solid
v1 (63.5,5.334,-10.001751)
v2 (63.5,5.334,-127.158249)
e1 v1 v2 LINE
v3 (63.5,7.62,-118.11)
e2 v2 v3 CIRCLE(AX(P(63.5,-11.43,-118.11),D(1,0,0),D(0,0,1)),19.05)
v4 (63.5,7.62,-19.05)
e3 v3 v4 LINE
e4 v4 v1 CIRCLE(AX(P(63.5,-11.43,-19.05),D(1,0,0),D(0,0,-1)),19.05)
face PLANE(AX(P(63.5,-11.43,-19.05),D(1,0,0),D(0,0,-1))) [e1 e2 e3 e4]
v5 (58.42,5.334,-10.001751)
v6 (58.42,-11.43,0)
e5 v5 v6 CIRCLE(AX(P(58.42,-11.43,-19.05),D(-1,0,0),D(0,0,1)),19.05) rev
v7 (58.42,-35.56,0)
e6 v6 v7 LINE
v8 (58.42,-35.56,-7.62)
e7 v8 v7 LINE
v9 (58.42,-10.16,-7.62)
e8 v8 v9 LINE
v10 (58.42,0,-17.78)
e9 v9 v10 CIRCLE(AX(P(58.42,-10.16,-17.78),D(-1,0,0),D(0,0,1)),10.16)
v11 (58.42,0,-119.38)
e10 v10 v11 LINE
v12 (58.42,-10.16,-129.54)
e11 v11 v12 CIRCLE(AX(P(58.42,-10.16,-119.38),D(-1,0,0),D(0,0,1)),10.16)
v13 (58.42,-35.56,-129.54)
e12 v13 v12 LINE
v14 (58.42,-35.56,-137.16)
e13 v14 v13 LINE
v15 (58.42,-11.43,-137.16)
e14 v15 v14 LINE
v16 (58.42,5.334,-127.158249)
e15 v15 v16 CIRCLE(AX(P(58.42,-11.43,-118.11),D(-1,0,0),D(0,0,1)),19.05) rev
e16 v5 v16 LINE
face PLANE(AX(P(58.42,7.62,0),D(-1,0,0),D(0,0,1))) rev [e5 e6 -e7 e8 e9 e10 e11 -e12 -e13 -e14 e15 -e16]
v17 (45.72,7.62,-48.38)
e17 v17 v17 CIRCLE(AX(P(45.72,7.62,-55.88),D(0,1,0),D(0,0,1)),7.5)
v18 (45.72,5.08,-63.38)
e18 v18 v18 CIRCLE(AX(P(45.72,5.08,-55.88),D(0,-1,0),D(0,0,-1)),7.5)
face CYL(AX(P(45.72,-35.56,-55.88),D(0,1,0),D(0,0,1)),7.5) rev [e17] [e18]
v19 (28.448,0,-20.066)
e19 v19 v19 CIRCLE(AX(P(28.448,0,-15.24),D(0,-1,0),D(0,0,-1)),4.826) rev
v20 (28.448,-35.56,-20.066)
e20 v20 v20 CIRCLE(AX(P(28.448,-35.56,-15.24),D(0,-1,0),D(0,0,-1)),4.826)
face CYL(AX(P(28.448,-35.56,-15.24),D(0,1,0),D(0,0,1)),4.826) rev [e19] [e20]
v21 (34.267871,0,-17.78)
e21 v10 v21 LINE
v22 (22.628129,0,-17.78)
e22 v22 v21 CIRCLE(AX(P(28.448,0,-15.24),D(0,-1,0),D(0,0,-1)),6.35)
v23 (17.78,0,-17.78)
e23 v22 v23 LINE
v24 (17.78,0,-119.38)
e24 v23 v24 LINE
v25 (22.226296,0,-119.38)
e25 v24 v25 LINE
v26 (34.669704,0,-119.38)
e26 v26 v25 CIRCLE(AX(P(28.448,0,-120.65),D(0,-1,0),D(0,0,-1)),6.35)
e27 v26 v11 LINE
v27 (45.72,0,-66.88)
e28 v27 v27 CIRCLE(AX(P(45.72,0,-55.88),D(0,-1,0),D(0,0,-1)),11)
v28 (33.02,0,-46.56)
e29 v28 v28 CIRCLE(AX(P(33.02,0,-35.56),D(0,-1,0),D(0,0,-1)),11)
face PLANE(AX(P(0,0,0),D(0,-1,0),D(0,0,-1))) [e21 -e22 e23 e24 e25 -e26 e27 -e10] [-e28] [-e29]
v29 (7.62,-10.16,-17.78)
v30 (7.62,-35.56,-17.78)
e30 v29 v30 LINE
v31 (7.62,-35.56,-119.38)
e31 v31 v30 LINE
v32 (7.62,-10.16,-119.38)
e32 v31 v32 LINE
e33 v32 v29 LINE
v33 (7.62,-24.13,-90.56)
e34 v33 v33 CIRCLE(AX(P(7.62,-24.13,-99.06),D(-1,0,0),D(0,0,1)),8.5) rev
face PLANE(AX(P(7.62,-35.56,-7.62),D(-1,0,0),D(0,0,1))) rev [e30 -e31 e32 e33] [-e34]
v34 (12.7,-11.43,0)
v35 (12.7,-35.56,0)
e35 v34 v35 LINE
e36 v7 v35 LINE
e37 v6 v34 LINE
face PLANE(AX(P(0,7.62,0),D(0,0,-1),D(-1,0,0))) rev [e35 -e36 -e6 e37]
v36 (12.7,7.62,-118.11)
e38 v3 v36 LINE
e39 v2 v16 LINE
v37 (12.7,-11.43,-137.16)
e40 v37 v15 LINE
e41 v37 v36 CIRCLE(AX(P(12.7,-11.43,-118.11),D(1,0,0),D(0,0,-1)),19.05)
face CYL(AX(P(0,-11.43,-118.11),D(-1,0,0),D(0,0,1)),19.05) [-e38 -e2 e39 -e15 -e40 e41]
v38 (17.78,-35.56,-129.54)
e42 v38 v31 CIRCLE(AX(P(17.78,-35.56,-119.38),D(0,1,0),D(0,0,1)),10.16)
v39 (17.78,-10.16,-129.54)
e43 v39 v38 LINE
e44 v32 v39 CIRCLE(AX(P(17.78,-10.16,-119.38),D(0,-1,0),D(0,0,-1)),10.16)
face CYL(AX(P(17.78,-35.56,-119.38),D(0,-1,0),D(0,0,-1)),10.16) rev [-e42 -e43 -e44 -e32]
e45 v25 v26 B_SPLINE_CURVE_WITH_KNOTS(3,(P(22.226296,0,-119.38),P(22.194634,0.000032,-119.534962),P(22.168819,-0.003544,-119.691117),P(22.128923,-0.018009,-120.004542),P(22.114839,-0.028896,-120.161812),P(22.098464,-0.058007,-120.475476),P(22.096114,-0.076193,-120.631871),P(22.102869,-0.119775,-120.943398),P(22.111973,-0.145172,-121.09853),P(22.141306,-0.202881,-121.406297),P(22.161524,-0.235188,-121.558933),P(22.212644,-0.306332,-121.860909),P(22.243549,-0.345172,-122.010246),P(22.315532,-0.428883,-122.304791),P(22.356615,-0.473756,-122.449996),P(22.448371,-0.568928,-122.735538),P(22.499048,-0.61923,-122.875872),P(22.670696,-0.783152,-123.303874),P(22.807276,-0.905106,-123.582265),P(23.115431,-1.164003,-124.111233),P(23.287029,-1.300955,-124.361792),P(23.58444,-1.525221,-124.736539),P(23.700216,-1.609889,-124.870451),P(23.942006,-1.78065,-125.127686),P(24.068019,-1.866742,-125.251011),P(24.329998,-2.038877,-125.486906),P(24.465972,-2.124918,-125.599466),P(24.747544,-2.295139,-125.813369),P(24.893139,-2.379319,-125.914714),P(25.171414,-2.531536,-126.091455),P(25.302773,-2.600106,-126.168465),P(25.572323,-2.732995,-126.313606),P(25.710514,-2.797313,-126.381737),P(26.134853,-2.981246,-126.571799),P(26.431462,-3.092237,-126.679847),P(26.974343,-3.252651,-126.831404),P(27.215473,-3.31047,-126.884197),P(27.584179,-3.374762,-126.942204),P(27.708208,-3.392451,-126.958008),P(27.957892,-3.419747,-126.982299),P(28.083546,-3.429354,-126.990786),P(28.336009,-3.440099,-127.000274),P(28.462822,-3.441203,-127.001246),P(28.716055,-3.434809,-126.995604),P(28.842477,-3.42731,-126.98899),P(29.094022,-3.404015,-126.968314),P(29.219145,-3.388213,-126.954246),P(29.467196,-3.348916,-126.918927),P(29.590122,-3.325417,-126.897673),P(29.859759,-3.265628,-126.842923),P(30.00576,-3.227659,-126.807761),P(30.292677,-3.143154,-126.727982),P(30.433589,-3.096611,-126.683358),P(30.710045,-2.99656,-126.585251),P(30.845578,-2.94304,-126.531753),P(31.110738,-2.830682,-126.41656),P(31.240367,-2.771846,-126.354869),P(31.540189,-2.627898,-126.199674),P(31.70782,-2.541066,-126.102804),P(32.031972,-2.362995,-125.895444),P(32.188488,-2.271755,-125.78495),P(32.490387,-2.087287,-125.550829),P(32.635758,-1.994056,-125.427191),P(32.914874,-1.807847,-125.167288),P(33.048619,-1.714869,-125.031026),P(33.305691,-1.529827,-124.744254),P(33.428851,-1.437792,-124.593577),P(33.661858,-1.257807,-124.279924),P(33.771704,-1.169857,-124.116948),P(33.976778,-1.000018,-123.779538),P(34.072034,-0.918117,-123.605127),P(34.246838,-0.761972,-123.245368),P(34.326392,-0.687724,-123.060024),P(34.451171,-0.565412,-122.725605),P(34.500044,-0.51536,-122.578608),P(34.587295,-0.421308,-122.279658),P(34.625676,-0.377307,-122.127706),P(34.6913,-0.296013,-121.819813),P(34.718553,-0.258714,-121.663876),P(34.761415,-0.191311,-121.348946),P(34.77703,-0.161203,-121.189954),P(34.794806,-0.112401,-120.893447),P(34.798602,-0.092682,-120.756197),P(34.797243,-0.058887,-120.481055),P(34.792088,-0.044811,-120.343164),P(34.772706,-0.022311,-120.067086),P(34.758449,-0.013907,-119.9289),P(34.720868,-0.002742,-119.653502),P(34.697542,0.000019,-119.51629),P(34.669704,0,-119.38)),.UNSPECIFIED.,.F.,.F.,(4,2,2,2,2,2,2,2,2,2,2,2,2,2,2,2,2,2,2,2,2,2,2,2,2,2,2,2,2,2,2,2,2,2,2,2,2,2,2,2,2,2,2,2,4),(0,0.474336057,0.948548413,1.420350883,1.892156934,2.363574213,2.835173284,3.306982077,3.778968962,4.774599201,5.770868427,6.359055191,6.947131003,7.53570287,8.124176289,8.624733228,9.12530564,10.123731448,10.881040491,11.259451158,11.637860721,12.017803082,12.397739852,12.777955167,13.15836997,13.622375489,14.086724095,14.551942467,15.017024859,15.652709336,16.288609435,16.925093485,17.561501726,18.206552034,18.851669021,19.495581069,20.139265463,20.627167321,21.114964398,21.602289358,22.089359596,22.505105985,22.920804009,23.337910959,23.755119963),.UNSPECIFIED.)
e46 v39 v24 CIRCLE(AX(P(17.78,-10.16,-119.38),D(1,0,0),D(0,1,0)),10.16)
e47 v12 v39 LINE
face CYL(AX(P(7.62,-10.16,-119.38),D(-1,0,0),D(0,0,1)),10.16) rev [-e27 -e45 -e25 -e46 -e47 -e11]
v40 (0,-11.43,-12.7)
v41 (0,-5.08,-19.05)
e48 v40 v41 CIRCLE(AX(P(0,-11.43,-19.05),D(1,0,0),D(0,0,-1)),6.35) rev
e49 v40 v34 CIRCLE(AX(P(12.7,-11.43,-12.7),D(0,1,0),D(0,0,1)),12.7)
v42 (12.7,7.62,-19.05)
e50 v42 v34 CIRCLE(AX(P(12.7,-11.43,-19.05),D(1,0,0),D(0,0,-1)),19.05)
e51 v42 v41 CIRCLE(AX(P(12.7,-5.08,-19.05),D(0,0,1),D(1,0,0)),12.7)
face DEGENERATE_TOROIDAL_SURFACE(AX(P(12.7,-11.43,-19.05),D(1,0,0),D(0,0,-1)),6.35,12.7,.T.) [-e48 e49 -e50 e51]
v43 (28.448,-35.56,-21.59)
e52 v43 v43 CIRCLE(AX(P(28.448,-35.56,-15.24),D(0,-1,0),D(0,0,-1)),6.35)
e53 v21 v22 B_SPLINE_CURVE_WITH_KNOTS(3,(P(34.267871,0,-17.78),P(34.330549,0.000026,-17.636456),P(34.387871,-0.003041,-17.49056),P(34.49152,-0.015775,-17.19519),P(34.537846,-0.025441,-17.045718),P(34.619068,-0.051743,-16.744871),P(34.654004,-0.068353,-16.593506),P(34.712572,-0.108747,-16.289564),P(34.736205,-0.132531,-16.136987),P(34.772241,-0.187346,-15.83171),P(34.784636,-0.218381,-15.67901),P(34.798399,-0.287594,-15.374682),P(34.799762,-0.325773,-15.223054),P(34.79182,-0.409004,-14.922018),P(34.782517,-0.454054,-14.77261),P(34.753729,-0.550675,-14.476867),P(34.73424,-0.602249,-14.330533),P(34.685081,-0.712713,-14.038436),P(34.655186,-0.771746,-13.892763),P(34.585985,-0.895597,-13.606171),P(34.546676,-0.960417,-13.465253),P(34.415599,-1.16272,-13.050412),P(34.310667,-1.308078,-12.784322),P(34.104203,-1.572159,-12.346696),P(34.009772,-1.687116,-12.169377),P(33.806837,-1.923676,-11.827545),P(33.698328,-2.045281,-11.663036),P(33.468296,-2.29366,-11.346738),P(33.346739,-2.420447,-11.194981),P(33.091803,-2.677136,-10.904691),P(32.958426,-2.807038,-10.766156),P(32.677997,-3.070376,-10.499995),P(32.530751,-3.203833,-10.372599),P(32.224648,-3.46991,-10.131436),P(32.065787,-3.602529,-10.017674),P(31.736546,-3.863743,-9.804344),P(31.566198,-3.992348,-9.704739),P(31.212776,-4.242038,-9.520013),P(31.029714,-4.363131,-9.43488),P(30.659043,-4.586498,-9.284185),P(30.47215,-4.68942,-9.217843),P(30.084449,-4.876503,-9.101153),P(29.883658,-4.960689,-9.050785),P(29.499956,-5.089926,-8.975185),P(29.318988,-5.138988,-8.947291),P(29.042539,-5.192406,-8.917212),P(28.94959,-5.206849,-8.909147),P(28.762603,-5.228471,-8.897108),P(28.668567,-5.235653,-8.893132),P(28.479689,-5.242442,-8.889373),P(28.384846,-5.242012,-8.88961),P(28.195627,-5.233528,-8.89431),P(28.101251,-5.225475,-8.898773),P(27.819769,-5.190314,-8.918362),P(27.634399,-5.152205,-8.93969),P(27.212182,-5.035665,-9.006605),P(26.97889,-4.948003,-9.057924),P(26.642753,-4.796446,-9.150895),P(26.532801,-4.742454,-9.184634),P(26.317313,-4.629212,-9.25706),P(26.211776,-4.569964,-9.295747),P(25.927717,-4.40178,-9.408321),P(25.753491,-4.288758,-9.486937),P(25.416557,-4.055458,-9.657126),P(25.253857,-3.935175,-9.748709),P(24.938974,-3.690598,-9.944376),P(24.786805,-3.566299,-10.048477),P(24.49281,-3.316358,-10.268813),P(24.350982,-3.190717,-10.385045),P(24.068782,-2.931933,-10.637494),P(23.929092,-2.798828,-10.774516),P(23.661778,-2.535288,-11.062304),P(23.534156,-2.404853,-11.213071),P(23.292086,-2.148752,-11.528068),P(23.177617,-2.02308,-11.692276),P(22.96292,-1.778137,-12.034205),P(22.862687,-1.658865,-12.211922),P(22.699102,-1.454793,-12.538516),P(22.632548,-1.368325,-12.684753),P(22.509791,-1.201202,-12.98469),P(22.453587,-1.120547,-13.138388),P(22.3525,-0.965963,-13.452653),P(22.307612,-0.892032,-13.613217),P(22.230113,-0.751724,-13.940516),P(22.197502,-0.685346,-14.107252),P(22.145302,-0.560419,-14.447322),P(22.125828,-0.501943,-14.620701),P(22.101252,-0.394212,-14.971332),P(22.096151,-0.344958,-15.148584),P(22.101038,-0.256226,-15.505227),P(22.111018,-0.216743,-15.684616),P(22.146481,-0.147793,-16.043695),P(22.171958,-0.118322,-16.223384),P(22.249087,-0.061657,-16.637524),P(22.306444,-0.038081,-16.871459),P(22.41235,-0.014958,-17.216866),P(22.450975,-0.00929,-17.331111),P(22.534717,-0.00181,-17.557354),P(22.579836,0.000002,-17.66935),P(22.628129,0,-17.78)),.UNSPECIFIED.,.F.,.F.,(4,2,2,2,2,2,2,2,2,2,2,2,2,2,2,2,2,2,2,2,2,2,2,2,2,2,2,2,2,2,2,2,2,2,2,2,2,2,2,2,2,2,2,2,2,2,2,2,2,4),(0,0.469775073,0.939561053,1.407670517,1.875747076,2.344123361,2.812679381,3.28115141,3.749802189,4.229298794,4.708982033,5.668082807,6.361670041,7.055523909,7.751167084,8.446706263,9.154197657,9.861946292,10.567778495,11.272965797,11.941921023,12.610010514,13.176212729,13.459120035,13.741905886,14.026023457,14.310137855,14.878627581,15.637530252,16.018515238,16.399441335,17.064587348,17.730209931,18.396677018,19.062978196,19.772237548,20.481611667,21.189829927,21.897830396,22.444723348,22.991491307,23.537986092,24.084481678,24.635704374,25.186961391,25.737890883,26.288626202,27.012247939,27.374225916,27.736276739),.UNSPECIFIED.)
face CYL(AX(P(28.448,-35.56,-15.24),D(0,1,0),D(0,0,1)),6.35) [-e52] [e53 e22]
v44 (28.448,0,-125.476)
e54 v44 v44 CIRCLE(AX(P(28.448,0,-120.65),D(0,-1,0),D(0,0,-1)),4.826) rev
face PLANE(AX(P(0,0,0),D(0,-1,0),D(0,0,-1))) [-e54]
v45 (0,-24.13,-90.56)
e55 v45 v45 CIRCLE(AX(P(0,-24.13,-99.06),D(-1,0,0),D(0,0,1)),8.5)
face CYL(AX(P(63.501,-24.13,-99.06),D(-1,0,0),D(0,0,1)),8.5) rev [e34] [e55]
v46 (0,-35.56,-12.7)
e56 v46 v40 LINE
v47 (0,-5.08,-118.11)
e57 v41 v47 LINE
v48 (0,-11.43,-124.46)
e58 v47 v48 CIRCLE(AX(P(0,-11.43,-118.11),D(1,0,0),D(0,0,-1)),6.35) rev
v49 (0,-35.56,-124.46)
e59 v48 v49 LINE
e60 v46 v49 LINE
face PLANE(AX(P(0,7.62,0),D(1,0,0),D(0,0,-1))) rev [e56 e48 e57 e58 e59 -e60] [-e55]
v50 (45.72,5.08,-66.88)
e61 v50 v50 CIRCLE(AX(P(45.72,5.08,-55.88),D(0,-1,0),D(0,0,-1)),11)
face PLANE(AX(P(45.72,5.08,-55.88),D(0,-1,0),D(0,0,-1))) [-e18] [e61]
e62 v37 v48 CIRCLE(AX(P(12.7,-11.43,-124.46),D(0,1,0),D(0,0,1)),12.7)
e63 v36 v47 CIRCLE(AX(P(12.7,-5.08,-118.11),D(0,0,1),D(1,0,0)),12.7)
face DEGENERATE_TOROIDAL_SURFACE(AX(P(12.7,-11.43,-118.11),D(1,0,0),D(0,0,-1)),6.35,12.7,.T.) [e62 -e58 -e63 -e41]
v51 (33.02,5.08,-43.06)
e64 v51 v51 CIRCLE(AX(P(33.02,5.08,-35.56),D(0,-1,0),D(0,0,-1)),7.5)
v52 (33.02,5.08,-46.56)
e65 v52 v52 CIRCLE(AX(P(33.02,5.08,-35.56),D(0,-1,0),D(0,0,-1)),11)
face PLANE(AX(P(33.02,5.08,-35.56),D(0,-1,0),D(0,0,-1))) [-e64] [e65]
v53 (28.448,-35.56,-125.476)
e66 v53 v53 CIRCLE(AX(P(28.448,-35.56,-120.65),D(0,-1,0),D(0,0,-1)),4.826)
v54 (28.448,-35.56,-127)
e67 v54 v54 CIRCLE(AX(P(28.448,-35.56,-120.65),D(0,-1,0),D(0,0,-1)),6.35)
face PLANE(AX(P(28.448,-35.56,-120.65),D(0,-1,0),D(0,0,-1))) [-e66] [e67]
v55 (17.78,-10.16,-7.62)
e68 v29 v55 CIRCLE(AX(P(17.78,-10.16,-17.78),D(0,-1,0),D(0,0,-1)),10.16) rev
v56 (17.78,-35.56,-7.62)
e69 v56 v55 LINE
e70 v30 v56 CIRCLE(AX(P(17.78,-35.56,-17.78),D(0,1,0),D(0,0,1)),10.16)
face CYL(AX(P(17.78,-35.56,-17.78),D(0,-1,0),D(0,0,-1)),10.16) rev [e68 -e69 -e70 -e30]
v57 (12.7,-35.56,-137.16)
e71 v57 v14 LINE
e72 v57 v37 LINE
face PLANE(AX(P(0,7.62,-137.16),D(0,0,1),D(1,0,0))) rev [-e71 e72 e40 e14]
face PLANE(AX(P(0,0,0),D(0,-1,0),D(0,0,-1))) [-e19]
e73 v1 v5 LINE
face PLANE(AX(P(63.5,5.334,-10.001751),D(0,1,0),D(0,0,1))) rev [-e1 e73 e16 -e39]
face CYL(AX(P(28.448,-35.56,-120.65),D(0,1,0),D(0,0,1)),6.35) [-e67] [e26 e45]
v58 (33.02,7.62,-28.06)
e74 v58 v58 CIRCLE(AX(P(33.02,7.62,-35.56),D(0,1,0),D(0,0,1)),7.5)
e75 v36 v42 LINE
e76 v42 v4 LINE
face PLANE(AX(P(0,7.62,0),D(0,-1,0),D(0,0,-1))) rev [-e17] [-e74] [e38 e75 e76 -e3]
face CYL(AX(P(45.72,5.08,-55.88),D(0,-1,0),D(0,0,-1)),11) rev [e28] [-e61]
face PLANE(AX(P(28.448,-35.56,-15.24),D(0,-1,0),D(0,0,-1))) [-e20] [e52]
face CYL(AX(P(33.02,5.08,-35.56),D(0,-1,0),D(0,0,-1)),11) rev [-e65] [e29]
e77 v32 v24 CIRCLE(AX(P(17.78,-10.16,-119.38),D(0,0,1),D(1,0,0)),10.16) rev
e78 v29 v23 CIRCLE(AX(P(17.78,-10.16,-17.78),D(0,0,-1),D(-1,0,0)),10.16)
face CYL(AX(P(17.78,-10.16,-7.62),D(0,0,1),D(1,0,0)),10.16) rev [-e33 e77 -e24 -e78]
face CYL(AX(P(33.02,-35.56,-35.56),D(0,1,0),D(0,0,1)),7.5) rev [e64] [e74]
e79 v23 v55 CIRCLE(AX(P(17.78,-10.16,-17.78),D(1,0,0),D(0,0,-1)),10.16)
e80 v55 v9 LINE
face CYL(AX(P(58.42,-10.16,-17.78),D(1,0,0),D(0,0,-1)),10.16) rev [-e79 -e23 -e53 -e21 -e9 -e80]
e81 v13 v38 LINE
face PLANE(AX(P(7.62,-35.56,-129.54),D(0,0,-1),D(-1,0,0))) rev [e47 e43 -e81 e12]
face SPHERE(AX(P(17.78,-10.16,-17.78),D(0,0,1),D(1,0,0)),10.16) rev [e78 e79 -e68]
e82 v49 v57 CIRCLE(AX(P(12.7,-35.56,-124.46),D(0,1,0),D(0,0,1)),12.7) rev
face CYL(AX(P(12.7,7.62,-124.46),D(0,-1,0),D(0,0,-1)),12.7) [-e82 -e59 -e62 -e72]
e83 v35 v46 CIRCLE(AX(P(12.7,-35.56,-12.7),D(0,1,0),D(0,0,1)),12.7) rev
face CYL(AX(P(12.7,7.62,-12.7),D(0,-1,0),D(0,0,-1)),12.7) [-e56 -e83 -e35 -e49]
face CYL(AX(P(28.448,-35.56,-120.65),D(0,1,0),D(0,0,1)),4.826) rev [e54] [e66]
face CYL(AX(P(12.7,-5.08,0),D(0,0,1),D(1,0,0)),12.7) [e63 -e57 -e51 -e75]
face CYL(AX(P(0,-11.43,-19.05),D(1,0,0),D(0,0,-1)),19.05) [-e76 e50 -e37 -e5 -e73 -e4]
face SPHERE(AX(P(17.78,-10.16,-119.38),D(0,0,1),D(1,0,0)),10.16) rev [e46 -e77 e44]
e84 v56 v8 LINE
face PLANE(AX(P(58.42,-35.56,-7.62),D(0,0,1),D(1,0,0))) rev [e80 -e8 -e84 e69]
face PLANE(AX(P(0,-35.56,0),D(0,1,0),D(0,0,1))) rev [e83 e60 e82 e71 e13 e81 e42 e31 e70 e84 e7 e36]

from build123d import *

# Parameters (mm, degrees)
SKETCH1_W           = 58.42
SKETCH1_H           = 137.16
BOSS_EXTRUDE1_DEPTH = 7.62
SKETCH2_R           = 6.35
SKETCH2_R_2         = 4.826
BOSS_EXTRUDE2_DEPTH = 35.56
BOSS_EXTRUDE3_DEPTH = 35.56
FILLET1_R           = 19.05
FILLET2_R           = 12.7
BOSS_EXTRUDE4_DEPTH = 5.08
SKETCH7_R           = 7.5
CUT_EXTRUDE1_DEPTH  = 158.192964219
CUT_EXTRUDE2_START  = -5.08
SKETCH8_R           = 11
SKETCH8_R_2         = 7.5
CUT_EXTRUDE2_DEPTH  = 5.08
FILLET3_R           = 10.16
CUT_EXTRUDE3_REACH  = 157.273
SKETCH9_R           = 8.5


with BuildPart() as part:
    # Sketch1 → Boss-Extrude1 (new body)
    with BuildSketch(Plane(origin=(0, 0, 0), x_dir=(1, 0, 0), z_dir=(0, 1, 0))):
        with Locations((29.21, 68.58)):
            Rectangle(SKETCH1_W, SKETCH1_H)
    extrude(amount=BOSS_EXTRUDE1_DEPTH)

    # Sketch2 → Boss-Extrude2 (add)
    # profile 1 of 2: a face of its own
    with BuildSketch(Plane.XZ):
        with Locations(Location((28.448, -120.65, 0), (0, 0, 270))):
            Circle(SKETCH2_R)
        with Locations(Location((28.448, -120.65, 0), (0, 0, 270))):
            Circle(SKETCH2_R_2, mode=Mode.SUBTRACT)
    # profile 2 of 2: a face of its own
    with BuildSketch(Plane.XZ):
        with Locations(Location((28.448, -15.24, 0), (0, 0, 270))):
            Circle(SKETCH2_R)
        with Locations(Location((28.448, -15.24, 0), (0, 0, 270))):
            Circle(SKETCH2_R_2, mode=Mode.SUBTRACT)
    extrude(amount=BOSS_EXTRUDE2_DEPTH)

    # Sketch3 → Boss-Extrude3 (add)
    with BuildSketch(Plane.XZ):
        Polygon((58.42, -137.16), (0, -137.16), (0, 0), (58.42, 0), (58.42, -7.62), (7.62, -7.62), (7.62, -129.54), (58.42, -129.54), align=None)
    extrude(amount=BOSS_EXTRUDE3_DEPTH)

    # Fillet1
    fillet1_edges = [part.edges().sort_by_distance(p)[0] for p in [
        (29.21, 7.62, -137.16),
        (29.21, 7.62, 0),
    ]]
    fillet(fillet1_edges, radius=FILLET1_R)

    # Fillet2
    fillet2_edges = [part.edges().sort_by_distance(p)[0] for p in [
        (0, 7.62, -68.58),
        (0, -23.495, 0),
        (0, -23.495, -137.16),
        (0, 2.040384182, -131.580384182),
        (0, 2.040384182, -5.579615818),
    ]]
    fillet(fillet2_edges, radius=FILLET2_R)

    # Sketch4 → Boss-Extrude4 (add)
    with BuildSketch(Plane(origin=(58.42, 0, 0), x_dir=(0, 0, -1), z_dir=(1, 0, 0))):
        with BuildLine():
            Line((10.00175133, 5.334), (127.15824867, 5.334))
            ThreePointArc((127.15824867, 5.334), (122.77627796, 7.039660257), (118.11, 7.62))
            Line((118.11, 7.62), (19.05, 7.62))
            ThreePointArc((19.05, 7.62), (14.38372204, 7.039660257), (10.00175133, 5.334))
        make_face()
    extrude(amount=BOSS_EXTRUDE4_DEPTH)

    # Sketch7 → Cut-Extrude1 (cut, through all)
    with BuildSketch(Plane(origin=(0, 7.62, 0), x_dir=(1, 0, 0), z_dir=(0, 1, 0))):
        with Locations(Location((45.72, 55.88, 0), (0, 0, 270))):
            Circle(SKETCH7_R)
        with Locations(Location((33.02, 35.56, 0), (0, 0, 270))):
            Circle(SKETCH7_R)
    extrude(amount=-CUT_EXTRUDE1_DEPTH, mode=Mode.SUBTRACT)

    # Sketch8 → Cut-Extrude2 (cut)
    # profile 1 of 2: a face of its own
    with BuildSketch(Plane.XZ.offset(CUT_EXTRUDE2_START)):
        with Locations(Location((45.72, -55.88, 0), (0, 0, 270))):
            Circle(SKETCH8_R)
        with Locations(Location((45.72, -55.88, 0), (0, 0, 90))):
            Circle(SKETCH8_R_2, mode=Mode.SUBTRACT)
    # profile 2 of 2: a face of its own
    with BuildSketch(Plane.XZ.offset(CUT_EXTRUDE2_START)):
        with Locations(Location((33.02, -35.56, 0), (0, 0, 270))):
            Circle(SKETCH8_R)
        with Locations(Location((33.02, -35.56, 0), (0, 0, 90))):
            Circle(SKETCH8_R_2, mode=Mode.SUBTRACT)
    extrude(amount=CUT_EXTRUDE2_DEPTH, mode=Mode.SUBTRACT)

    # Fillet3
    # the kernel refuses this fillet: 10.16 mm, written as the material it adds along each edge
    with BuildSketch(Plane(origin=(17.78, -10.16, -119.38), x_dir=(0, 1, 0), z_dir=(-1, 0, 0))) as fillet3_piece_1_section:
        Polygon((0, 0), (FILLET3_R * 1.02, 0), (FILLET3_R * 1.02, FILLET3_R * 1.02), (0, FILLET3_R * 1.02), align=None)
    fillet3_piece_1 = extrude(amount=FILLET3_R * 1.02, mode=Mode.PRIVATE)
    fillet3_piece_1 = fillet3_piece_1 - Plane(origin=(17.78, -10.16, -119.38), x_dir=(0, -0.7071067811865475, 0.7071067811865475), z_dir=(-1, 0, 0)) * Sphere(FILLET3_R, mode=Mode.PRIVATE)
    add(fillet3_piece_1)
    with BuildSketch(Plane(origin=(17.78, -10.16, -17.78), x_dir=(0, 0, 1), z_dir=(-1, 0, 0))) as fillet3_piece_2_section:
        Polygon((0, 0), (FILLET3_R * 1.02, 0), (FILLET3_R * 1.02, FILLET3_R * 1.02), (0, FILLET3_R * 1.02), align=None)
    fillet3_piece_2 = extrude(amount=FILLET3_R * 1.02, mode=Mode.PRIVATE)
    fillet3_piece_2 = fillet3_piece_2 - Plane(origin=(17.78, -10.16, -17.78), x_dir=(0, -0.7071067811865475, -0.7071067811865475), z_dir=(-1, 0, 0)) * Sphere(FILLET3_R, mode=Mode.PRIVATE)
    add(fillet3_piece_2)
    with BuildSketch(Plane(origin=(17.78, 0, -129.54), x_dir=(0, 0, 1), z_dir=(1, 0, 0))) as fillet3_piece_3_section:
        with BuildLine():
            CenterArc((FILLET3_R, FILLET3_R), FILLET3_R, 180, 90)
            Line((0, FILLET3_R), (0, 0))
            Line((0, 0), (FILLET3_R, 0))
        make_face()
    fillet3_piece_3 = extrude(amount=40.64, mode=Mode.PRIVATE)
    fillet3_piece_3 = fillet3_piece_3 - Plane(origin=(28.448, -2.379056343, -120.65), x_dir=(0, 0, -1), z_dir=(0, 1, 0)) * Cylinder(4.826, 122, mode=Mode.PRIVATE)
    add(fillet3_piece_3)
    with BuildSketch(Plane(origin=(7.62, 0, -17.78), x_dir=(1, 0, 0), z_dir=(0, 0, -1))) as fillet3_piece_4:
        with BuildLine():
            CenterArc((FILLET3_R, FILLET3_R), FILLET3_R, 180, 90)
            Line((0, FILLET3_R), (0, 0))
            Line((0, 0), (FILLET3_R, 0))
        make_face()
    extrude(amount=101.6)
    with BuildSketch(Plane(origin=(7.62, -10.16, -129.54), x_dir=(1, 0, 0), z_dir=(0, -1, 0))) as fillet3_piece_5:
        with BuildLine():
            CenterArc((FILLET3_R, FILLET3_R), FILLET3_R, 180, 90)
            Line((0, FILLET3_R), (0, 0))
            Line((0, 0), (FILLET3_R, 0))
        make_face()
    extrude(amount=25.4)
    with BuildSketch(Plane(origin=(58.42, 0, -7.62), x_dir=(0, -1, 0), z_dir=(-1, 0, 0))) as fillet3_piece_6_section:
        with BuildLine():
            CenterArc((FILLET3_R, -FILLET3_R), FILLET3_R, 90, 90)
            Line((0, -FILLET3_R), (0, 0))
            Line((0, 0), (FILLET3_R, 0))
        make_face()
    fillet3_piece_6 = extrude(amount=40.64, mode=Mode.PRIVATE)
    fillet3_piece_6 = fillet3_piece_6 - Plane(origin=(28.448, -2.418481563, -15.24), x_dir=(0, 0, -1), z_dir=(0, 1, 0)) * Cylinder(4.826, 122, mode=Mode.PRIVATE)
    add(fillet3_piece_6)
    with BuildSketch(Plane(origin=(7.62, -10.16, -7.62), x_dir=(1, 0, 0), z_dir=(0, -1, 0))) as fillet3_piece_7:
        with BuildLine():
            CenterArc((FILLET3_R, -FILLET3_R), FILLET3_R, 90, 90)
            Line((0, -FILLET3_R), (0, 0))
            Line((0, 0), (FILLET3_R, 0))
        make_face()
    extrude(amount=25.4)

    # Sketch9 → Cut-Extrude3 (cut, up to next)
    with BuildSketch(Plane.ZY, mode=Mode.PRIVATE) as cut_extrude3_sk1:
        with Locations((-99.06, -24.13)):
            Circle(SKETCH9_R)
    cut_extrude3_tool1 = extrude(cut_extrude3_sk1.sketch, amount=-CUT_EXTRUDE3_REACH, mode=Mode.PRIVATE) & part.part
    add(cut_extrude3_tool1.solids().sort_by_distance((0, -24.13, -99.06))[0], mode=Mode.SUBTRACT)


solid = part.part
